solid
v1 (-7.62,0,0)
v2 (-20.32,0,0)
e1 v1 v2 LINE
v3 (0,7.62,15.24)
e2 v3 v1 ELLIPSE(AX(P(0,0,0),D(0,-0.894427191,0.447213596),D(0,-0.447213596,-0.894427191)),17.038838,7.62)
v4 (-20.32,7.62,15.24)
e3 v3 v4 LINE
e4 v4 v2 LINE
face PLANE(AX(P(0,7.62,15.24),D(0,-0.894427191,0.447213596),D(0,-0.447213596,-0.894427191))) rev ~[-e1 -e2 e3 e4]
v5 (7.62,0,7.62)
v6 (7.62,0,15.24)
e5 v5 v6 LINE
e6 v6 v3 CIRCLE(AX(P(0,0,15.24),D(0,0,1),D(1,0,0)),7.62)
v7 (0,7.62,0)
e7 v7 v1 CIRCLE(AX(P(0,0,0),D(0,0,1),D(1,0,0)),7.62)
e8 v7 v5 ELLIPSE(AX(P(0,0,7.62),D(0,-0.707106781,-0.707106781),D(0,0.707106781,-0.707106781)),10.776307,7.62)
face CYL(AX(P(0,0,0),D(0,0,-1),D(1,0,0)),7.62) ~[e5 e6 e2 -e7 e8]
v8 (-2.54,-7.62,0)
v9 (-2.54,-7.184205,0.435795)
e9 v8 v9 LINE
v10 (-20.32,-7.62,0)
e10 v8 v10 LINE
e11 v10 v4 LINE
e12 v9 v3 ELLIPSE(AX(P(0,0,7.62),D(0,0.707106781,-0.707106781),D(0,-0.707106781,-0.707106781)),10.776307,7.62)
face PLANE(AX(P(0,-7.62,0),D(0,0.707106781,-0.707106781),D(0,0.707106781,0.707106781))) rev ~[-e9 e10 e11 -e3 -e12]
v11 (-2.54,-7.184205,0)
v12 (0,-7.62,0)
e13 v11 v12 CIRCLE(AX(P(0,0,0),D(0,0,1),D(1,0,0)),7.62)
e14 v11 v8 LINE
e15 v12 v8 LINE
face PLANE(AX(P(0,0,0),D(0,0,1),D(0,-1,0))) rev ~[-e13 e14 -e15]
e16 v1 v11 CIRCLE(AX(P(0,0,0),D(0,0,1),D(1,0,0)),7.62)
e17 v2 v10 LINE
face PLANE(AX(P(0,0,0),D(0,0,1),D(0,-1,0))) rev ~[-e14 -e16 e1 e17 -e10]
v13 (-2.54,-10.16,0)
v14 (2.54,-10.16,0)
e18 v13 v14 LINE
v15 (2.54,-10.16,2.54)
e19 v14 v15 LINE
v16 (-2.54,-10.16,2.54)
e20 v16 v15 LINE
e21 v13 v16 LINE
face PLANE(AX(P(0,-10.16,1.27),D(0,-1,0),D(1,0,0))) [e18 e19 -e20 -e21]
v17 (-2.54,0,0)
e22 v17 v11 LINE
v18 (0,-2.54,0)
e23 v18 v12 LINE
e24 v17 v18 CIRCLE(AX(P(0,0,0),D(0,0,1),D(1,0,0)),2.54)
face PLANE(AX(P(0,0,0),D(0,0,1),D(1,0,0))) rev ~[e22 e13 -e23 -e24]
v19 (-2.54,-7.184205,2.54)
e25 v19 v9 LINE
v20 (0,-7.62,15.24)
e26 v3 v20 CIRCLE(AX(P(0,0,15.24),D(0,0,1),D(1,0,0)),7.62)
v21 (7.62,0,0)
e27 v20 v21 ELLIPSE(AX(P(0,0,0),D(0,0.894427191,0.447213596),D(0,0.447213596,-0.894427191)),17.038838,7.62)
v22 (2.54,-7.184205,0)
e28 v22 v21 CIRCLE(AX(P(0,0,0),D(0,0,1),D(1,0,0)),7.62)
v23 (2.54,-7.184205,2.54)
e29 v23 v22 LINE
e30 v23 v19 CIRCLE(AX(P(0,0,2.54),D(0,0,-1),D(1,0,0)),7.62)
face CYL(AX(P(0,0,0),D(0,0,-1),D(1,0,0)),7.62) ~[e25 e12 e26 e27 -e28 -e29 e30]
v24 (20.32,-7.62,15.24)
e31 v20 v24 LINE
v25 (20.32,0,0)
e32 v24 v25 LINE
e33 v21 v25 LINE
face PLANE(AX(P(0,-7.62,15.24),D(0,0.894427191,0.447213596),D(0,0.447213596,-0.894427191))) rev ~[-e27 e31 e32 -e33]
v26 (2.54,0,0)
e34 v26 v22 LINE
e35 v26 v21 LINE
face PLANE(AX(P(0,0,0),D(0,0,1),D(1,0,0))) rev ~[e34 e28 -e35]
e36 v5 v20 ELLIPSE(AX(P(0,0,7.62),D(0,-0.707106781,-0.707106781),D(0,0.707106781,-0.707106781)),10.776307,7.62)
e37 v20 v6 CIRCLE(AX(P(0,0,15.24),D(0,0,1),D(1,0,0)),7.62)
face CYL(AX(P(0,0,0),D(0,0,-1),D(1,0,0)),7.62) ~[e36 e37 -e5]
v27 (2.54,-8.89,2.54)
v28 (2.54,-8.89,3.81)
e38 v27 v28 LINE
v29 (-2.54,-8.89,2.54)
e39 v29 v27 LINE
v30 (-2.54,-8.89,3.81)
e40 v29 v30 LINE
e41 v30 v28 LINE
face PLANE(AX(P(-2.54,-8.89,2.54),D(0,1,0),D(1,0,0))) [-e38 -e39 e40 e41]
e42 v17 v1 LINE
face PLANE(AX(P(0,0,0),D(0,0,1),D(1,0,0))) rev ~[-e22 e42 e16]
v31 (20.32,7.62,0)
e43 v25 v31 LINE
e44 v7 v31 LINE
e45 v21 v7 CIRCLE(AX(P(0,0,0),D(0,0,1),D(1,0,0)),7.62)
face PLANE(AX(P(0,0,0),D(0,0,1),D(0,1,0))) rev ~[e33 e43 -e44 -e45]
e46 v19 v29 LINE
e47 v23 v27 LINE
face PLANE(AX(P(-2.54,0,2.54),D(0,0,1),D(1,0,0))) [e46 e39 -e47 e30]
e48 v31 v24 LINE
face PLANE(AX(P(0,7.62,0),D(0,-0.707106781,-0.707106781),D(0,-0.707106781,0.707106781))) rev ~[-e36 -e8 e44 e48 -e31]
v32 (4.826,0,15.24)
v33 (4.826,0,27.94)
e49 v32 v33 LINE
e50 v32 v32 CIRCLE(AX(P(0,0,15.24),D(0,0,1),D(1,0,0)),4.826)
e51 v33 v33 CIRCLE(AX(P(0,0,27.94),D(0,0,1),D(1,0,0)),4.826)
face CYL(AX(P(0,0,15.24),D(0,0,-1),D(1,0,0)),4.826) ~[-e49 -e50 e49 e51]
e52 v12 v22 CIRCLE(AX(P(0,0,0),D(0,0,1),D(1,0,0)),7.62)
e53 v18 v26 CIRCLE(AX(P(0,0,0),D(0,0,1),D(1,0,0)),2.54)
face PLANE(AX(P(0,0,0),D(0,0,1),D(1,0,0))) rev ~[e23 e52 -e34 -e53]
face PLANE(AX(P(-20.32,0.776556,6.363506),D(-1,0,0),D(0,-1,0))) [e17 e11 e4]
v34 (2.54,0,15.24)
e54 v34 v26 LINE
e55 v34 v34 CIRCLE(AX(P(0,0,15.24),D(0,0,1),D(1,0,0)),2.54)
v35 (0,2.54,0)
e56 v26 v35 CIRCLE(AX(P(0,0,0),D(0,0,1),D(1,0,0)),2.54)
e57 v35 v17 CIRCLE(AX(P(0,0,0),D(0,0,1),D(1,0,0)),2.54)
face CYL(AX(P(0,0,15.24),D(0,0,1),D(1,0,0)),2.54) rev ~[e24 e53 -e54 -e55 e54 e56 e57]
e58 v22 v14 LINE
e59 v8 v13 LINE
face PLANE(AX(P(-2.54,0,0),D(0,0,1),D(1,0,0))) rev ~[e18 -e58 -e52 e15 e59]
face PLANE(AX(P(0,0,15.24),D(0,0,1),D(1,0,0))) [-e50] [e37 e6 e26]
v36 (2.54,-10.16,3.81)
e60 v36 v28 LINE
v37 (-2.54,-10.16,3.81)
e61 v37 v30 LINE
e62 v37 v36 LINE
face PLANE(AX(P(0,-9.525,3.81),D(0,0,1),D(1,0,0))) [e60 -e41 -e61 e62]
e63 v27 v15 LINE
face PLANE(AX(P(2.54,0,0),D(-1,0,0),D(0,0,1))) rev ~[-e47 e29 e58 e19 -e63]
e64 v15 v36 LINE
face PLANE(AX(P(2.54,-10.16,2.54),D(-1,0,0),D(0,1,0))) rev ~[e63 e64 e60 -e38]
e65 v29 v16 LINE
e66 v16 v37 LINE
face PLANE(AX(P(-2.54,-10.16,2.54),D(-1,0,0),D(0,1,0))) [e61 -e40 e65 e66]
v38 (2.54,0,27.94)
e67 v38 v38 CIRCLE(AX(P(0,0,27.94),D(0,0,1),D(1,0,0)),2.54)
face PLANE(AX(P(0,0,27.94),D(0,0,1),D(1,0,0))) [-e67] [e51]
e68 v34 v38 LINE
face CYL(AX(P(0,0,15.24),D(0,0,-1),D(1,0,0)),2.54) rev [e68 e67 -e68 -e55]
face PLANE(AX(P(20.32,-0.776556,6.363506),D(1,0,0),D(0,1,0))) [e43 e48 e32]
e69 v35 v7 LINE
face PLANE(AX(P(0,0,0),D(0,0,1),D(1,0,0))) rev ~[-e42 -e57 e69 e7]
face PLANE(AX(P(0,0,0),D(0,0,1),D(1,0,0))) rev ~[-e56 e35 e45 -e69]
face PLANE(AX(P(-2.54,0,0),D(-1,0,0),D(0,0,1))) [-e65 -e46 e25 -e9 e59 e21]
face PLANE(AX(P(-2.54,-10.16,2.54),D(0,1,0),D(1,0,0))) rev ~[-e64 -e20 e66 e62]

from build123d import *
from build123d import SkipClean  # not in build123d's __all__

# Parameters (mm, degrees)
F0_R      = 7.62
F1_DEPTH  = 15.24
F3_DEPTH  = 20.32
F5_COUNT  = 2
F6_W      = 5.0799995622
F6_H      = 2.54
F7_DEPTH  = 10.16
F8_W      = 5.0799995622
F8_H      = 1.27
F9_DEPTH  = 1.27
F10_R     = 2.54
F11_DEPTH = 15.241
F12_R     = 4.826
F12_R_2   = 2.54
F13_DEPTH = 12.7


with BuildPart() as f1:
    # F0 (on Top) → F1 (new body)
    with BuildSketch(Plane.XY):
        Circle(F0_R)
    extrude(amount=F1_DEPTH)



with BuildPart() as f3:
    # F2 (on Right) → F3 (new body)
    with BuildSketch(Plane.YZ):
        Polygon((-7.62, 15.24), (0, 0), (7.62, 0), align=None)
    extrude(amount=F3_DEPTH)


with BuildPart() as f1_1:
    add(f1.part, clean=False)

    with SkipClean():  # cleaning this boolean's faces spoils the solid; the shape is the same uncleaned
        add(f3.part)  # F5 merges F3
    # F5: F3 ×2 about axis
    f5_axis = Axis((0, 0, 17.5851359963), (0, 0, 1))
    with SkipClean():  # cleaning this boolean's faces spoils the solid; the shape is the same uncleaned
        for i in range(1, F5_COUNT):
            add(f3.part.rotate(f5_axis, i * 360 / F5_COUNT), clean=False)

    # F6 (on Front) → F7 (join)
    with BuildSketch(Plane.XZ):
        with Locations((0, 1.27)):
            Rectangle(F6_W, F6_H)
    with SkipClean():  # cleaning this boolean's faces spoils the solid; the shape is the same uncleaned
        extrude(amount=F7_DEPTH)

    # F8 (on face) → F9 (join)
    with BuildSketch(Plane.XY.offset(2.54)):
        with Locations((0, -9.525)):
            Rectangle(F8_W, F8_H)
    with SkipClean():  # cleaning this boolean's faces spoils the solid; the shape is the same uncleaned
        extrude(amount=F9_DEPTH)

    # F10 (on face) → F11 (cut, through all)
    with BuildSketch(Plane.XY.offset(15.24)):
        Circle(F10_R)
    with SkipClean():  # cleaning this boolean's faces spoils the solid; the shape is the same uncleaned
        extrude(amount=-F11_DEPTH, mode=Mode.SUBTRACT)

    # F12 (on face) → F13 (join)
    with BuildSketch(Plane.XY.offset(15.24)):
        Circle(F12_R)
        Circle(F12_R_2, mode=Mode.SUBTRACT)
    with SkipClean():  # cleaning this boolean's faces spoils the solid; the shape is the same uncleaned
        extrude(amount=F13_DEPTH)


solid = f1_1.part
